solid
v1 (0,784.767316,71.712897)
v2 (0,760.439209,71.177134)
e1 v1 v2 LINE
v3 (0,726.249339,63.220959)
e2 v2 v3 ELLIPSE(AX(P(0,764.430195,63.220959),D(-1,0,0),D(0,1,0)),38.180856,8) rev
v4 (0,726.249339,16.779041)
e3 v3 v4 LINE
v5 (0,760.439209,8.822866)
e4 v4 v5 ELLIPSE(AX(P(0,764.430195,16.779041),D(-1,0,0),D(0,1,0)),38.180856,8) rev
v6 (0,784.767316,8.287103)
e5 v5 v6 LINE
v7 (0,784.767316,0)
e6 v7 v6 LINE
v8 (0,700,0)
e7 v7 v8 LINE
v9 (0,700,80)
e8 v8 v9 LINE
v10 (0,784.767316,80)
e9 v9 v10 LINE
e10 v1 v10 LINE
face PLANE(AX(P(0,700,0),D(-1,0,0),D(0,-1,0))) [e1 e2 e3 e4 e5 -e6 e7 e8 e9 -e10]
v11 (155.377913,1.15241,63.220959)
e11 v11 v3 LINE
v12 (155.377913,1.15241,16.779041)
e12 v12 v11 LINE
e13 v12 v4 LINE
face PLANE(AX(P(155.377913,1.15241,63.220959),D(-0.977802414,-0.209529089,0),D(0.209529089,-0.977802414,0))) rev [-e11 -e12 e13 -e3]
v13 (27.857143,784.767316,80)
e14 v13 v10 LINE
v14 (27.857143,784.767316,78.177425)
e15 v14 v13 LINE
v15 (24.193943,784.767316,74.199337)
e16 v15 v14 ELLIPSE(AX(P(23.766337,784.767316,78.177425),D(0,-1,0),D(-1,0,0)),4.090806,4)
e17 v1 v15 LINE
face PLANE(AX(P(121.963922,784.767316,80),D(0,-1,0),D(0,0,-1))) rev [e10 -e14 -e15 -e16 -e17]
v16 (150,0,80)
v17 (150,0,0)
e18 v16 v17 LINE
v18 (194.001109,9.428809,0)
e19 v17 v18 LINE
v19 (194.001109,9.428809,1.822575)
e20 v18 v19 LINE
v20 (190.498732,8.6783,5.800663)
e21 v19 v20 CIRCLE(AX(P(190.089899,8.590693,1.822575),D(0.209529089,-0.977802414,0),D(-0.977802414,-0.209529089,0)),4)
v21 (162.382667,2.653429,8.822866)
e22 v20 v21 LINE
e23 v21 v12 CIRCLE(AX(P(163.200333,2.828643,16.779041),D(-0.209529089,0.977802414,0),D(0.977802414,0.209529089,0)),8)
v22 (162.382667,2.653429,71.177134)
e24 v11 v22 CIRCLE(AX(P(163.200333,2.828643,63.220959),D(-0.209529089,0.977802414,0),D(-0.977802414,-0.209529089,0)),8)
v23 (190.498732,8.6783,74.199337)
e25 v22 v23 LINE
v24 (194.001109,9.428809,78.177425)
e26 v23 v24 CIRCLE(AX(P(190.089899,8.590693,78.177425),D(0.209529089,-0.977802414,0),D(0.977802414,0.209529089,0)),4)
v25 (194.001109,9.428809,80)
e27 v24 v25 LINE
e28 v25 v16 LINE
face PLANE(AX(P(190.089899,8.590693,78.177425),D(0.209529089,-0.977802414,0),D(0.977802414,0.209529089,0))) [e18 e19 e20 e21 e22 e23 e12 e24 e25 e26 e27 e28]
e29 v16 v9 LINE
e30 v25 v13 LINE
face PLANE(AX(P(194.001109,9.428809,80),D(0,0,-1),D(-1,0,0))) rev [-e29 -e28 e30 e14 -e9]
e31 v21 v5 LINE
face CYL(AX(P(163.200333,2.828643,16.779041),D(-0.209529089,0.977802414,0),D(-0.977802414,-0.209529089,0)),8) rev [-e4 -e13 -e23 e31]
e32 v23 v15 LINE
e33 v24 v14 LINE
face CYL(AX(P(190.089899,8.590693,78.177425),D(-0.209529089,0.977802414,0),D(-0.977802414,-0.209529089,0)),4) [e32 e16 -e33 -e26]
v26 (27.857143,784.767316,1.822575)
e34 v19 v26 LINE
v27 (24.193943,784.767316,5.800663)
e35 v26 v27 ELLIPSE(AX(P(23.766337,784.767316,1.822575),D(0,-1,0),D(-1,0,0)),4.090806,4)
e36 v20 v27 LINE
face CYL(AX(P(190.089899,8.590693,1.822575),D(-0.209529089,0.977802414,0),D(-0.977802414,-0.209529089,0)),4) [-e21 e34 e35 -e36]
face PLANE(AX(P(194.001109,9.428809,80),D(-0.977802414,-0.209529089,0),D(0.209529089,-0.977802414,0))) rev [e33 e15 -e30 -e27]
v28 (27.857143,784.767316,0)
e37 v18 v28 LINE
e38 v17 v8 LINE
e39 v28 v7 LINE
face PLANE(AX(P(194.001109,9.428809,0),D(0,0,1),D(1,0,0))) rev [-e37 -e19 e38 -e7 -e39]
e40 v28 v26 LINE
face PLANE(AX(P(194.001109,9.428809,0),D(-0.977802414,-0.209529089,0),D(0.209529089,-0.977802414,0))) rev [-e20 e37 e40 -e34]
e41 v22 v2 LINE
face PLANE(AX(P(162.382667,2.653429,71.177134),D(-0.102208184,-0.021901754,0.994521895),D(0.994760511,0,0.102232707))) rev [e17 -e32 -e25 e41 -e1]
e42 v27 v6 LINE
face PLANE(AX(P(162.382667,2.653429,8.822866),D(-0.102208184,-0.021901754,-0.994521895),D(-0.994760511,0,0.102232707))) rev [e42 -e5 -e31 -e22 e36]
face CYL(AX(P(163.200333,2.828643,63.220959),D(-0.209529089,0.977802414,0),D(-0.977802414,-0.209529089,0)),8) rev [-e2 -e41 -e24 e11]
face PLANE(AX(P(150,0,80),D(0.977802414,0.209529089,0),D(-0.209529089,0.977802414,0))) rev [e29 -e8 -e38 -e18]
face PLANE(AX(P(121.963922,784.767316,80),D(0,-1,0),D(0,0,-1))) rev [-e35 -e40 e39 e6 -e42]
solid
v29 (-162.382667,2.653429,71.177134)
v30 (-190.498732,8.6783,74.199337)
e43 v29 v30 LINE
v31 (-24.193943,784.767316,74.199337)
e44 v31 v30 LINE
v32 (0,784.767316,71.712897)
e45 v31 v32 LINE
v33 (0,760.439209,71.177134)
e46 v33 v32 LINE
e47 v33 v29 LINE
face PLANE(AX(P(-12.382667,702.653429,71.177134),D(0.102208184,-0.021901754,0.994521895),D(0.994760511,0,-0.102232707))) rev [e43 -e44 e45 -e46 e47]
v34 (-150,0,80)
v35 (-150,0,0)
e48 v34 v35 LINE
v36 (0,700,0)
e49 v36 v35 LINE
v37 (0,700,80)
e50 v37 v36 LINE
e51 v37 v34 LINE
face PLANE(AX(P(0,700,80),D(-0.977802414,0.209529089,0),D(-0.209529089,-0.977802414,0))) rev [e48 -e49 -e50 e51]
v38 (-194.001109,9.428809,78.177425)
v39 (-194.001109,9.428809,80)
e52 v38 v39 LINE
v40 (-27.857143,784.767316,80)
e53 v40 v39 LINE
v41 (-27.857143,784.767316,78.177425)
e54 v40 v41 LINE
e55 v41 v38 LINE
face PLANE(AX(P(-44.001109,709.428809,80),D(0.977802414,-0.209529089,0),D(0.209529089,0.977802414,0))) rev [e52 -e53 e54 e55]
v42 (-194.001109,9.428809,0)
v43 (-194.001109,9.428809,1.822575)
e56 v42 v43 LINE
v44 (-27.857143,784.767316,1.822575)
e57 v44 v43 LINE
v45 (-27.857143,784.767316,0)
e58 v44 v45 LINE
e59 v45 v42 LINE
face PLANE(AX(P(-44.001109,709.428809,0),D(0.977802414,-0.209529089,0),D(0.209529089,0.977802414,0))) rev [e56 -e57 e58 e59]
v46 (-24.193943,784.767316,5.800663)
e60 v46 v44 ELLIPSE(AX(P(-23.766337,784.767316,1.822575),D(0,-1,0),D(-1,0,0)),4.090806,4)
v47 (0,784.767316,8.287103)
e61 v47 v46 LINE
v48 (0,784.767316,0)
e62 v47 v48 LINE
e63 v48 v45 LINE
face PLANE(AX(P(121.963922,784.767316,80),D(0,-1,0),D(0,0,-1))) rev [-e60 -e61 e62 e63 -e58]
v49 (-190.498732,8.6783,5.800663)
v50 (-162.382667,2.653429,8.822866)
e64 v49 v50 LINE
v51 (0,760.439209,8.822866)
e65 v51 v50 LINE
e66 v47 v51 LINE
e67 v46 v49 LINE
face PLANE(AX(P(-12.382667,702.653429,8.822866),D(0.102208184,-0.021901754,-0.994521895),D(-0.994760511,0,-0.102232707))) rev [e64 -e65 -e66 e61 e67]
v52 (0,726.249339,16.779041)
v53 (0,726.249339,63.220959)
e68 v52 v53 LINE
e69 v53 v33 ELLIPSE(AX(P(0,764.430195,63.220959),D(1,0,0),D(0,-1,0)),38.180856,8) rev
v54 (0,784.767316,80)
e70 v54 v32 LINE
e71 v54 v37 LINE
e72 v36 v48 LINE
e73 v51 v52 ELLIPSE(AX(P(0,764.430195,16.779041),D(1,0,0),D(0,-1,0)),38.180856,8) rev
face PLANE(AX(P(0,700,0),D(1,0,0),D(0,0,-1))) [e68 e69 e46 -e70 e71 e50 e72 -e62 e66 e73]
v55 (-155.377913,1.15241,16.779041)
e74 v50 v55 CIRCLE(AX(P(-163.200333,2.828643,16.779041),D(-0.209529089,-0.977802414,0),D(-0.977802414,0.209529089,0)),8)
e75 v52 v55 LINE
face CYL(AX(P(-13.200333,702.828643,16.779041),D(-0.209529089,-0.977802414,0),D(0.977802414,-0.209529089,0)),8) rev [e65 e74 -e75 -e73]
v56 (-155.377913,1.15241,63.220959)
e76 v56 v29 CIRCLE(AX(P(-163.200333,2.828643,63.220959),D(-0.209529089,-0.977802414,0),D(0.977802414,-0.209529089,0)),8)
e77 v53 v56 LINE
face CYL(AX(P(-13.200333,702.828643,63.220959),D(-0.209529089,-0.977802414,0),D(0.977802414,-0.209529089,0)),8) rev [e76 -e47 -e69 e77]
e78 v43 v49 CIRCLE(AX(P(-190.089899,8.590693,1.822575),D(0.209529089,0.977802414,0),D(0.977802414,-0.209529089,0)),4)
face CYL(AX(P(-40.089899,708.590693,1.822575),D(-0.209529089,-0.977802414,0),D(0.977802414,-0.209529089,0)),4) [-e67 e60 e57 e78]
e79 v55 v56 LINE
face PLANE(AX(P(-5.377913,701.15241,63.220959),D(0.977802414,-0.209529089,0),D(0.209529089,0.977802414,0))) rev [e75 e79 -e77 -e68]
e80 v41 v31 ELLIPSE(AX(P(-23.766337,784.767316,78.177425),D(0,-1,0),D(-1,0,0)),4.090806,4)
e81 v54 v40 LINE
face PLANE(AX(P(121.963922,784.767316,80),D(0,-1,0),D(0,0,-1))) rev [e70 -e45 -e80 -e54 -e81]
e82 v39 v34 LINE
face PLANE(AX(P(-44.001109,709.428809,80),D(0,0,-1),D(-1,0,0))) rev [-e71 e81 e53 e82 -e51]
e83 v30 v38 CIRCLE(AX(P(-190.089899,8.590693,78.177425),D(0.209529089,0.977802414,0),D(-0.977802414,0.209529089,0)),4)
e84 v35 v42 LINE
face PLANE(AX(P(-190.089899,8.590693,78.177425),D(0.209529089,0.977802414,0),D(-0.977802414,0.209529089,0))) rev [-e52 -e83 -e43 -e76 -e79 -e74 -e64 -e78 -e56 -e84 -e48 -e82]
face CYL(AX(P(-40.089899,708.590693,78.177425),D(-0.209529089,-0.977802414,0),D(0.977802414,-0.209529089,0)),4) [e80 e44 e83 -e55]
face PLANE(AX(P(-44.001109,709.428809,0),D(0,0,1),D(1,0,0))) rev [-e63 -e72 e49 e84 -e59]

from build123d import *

# Parameters (mm, degrees)
C_START                               = -31.42936331
C_CHANNEL_CONFIGURED_80_X_8_1_DEPTH   = 715.891053164
C_CHANNEL_CONFIGURED_80_X_8_1_2_DEPTH = 80
C_START_2                             = 684.461689854
C_CHANNEL_CONFIGURED_80_X_8_1_3_DEPTH = 210.538310146
C_START_3                             = -684.461689854
C_CHANNEL_CONFIGURED_80_X_8_1_4_DEPTH = 715.891053164
C_CHANNEL_CONFIGURED_80_X_8_1_5_DEPTH = 80
C_START_4                             = -895
C_CHANNEL_CONFIGURED_80_X_8_1_6_DEPTH = 210.538310146
SKETCH12_W                            = 228.035854542
SKETCH12_H                            = 149.852132985
CUT_EXTRUDE1_DEPTH                    = 939.528461201


with BuildPart() as part:
    # C channel - configured 80 X 8(1): read off the stored shape, not the designer's step
    # C channel - configured 80 X 8(1) outline → C channel - configured 80 X 8(1) (new body)
    with BuildSketch(Plane(origin=(0, 0, 0), x_dir=(0.9778024140774096, -0.20952908873087298, 0), z_dir=(0.20952908873087295, 0.9778024140774098, 0)).offset(C_START)):
        with BuildLine():
            ThreePointArc((-188.088475965, -74.199337243), (-190.642941414, -75.500902399), (-191.670362112, -78.177424825))
            Line((-191.670362112, -78.177424825), (-191.670362112, -80))
            Line((-191.670362112, -80), (-146.670362112, -80))
            Line((-146.670362112, -80), (-146.670362112, 0))
            Line((-146.670362112, 0), (-191.670362112, 0))
            Line((-191.670362112, 0), (-191.670362112, -1.822575175))
            ThreePointArc((-191.670362112, -1.822575175), (-190.642941414, -4.499097601), (-188.088475965, -5.800662757))
            Line((-188.088475965, -5.800662757), (-159.334134405, -8.822865837))
            ThreePointArc((-159.334134405, -8.822865837), (-154.225203508, -11.425996149), (-152.170362112, -16.779041))
            Line((-152.170362112, -16.779041), (-152.170362112, -63.220959))
            ThreePointArc((-152.170362112, -63.220959), (-154.225203508, -68.574003851), (-159.334134405, -71.177134163))
            Line((-159.334134405, -71.177134163), (-188.088475965, -74.199337243))
        make_face()
    extrude(amount=C_CHANNEL_CONFIGURED_80_X_8_1_DEPTH)

    # C channel - configured 80 X 8_1 2 outlin → C channel - configured 80 X 8_1 2 (add)
    with BuildSketch(Plane.XY):
        Polygon((0, 914.767315949), (-44.001108633, 709.428808993), (0, 700), align=None)
    extrude(amount=C_CHANNEL_CONFIGURED_80_X_8_1_2_DEPTH)

    # C channel - configured 80 X 8_1 3 outlin → C channel - configured 80 X 8_1 3 (cut)
    with BuildSketch(Plane(origin=(0, 0, 0), x_dir=(0.9778024140774096, -0.20952908873087298, 0), z_dir=(0.20952908873087295, 0.9778024140774098, 0)).offset(C_START_2)):
        with BuildLine():
            Line((-191.670362112, -1.822575175), (-191.670362112, -78.177424825))
            ThreePointArc((-191.670362112, -78.177424825), (-190.642941414, -75.500902399), (-188.088475965, -74.199337243))
            Line((-188.088475965, -74.199337243), (-159.334134405, -71.177134163))
            ThreePointArc((-159.334134405, -71.177134163), (-154.225203508, -68.574003851), (-152.170362112, -63.220959))
            Line((-152.170362112, -63.220959), (-152.170362112, -16.779041))
            ThreePointArc((-152.170362112, -16.779041), (-154.225203508, -11.425996149), (-159.334134405, -8.822865837))
            Line((-159.334134405, -8.822865837), (-188.088475965, -5.800662757))
            ThreePointArc((-188.088475965, -5.800662757), (-190.642941414, -4.499097601), (-191.670362112, -1.822575175))
        make_face()
    extrude(amount=C_CHANNEL_CONFIGURED_80_X_8_1_3_DEPTH, mode=Mode.SUBTRACT)


with BuildPart() as body_2:
    # C channel - configured 80 X 8_1 4 outlin → C channel - configured 80 X 8_1 4 (new body)
    with BuildSketch(Plane(origin=(0, 0, 0), x_dir=(0.9778024140774096, 0.20952908873087298, 0), z_dir=(0.20952908873087295, -0.9778024140774098, 0)).offset(C_START_3)):
        with BuildLine():
            ThreePointArc((188.088475965, 74.199337243), (190.642941414, 75.500902399), (191.670362112, 78.177424825))
            Line((191.670362112, 78.177424825), (191.670362112, 80))
            Line((191.670362112, 80), (146.670362112, 80))
            Line((146.670362112, 80), (146.670362112, 0))
            Line((146.670362112, 0), (191.670362112, 0))
            Line((191.670362112, 0), (191.670362112, 1.822575175))
            ThreePointArc((191.670362112, 1.822575175), (190.642941414, 4.499097601), (188.088475965, 5.800662757))
            Line((188.088475965, 5.800662757), (159.334134405, 8.822865837))
            ThreePointArc((159.334134405, 8.822865837), (154.225203508, 11.425996149), (152.170362112, 16.779041))
            Line((152.170362112, 16.779041), (152.170362112, 63.220959))
            ThreePointArc((152.170362112, 63.220959), (154.225203508, 68.574003851), (159.334134405, 71.177134163))
            Line((159.334134405, 71.177134163), (188.088475965, 74.199337243))
        make_face()
    extrude(amount=C_CHANNEL_CONFIGURED_80_X_8_1_4_DEPTH)

    # C channel - configured 80 X 8_1 5 outlin → C channel - configured 80 X 8_1 5 (add)
    with BuildSketch(Plane.XY):
        Polygon((44.001108633, 709.428808993), (0, 914.767315949), (0, 700), align=None)
    extrude(amount=C_CHANNEL_CONFIGURED_80_X_8_1_5_DEPTH)

    # C channel - configured 80 X 8_1 6 outlin → C channel - configured 80 X 8_1 6 (cut)
    with BuildSketch(Plane(origin=(0, 0, 0), x_dir=(0.9778024140774096, 0.20952908873087298, 0), z_dir=(0.20952908873087295, -0.9778024140774098, 0)).offset(C_START_4)):
        with BuildLine():
            Line((191.670362112, 1.822575175), (191.670362112, 78.177424825))
            ThreePointArc((191.670362112, 78.177424825), (190.642941414, 75.500902399), (188.088475965, 74.199337243))
            Line((188.088475965, 74.199337243), (159.334134405, 71.177134163))
            ThreePointArc((159.334134405, 71.177134163), (154.225203508, 68.574003851), (152.170362112, 63.220959))
            Line((152.170362112, 63.220959), (152.170362112, 16.779041))
            ThreePointArc((152.170362112, 16.779041), (154.225203508, 11.425996149), (159.334134405, 8.822865837))
            Line((159.334134405, 8.822865837), (188.088475965, 5.800662757))
            ThreePointArc((188.088475965, 5.800662757), (190.642941414, 4.499097601), (191.670362112, 1.822575175))
        make_face()
    extrude(amount=C_CHANNEL_CONFIGURED_80_X_8_1_6_DEPTH, mode=Mode.SUBTRACT)


with BuildPart() as cut_extrude1_tool:
    # Sketch12 → Cut-Extrude1 (new, through all)
    with BuildSketch(Plane(origin=(0, 0, 0), x_dir=(-1, 0, 0), z_dir=(0, 0, -1))):
        with Locations((-7.945995122, 859.693382442)):
            Rectangle(SKETCH12_W, SKETCH12_H)
    extrude(amount=-CUT_EXTRUDE1_DEPTH)


with BuildPart() as part_1:
    add(part.part)

    # Cut-Extrude1: cut by cut_extrude1_tool
    add(cut_extrude1_tool.part, mode=Mode.SUBTRACT)


with BuildPart() as body_2_1:
    add(body_2.part)

    # Cut-Extrude1: cut by cut_extrude1_tool
    add(cut_extrude1_tool.part, mode=Mode.SUBTRACT)


solid = Compound([part_1.part, body_2_1.part])
